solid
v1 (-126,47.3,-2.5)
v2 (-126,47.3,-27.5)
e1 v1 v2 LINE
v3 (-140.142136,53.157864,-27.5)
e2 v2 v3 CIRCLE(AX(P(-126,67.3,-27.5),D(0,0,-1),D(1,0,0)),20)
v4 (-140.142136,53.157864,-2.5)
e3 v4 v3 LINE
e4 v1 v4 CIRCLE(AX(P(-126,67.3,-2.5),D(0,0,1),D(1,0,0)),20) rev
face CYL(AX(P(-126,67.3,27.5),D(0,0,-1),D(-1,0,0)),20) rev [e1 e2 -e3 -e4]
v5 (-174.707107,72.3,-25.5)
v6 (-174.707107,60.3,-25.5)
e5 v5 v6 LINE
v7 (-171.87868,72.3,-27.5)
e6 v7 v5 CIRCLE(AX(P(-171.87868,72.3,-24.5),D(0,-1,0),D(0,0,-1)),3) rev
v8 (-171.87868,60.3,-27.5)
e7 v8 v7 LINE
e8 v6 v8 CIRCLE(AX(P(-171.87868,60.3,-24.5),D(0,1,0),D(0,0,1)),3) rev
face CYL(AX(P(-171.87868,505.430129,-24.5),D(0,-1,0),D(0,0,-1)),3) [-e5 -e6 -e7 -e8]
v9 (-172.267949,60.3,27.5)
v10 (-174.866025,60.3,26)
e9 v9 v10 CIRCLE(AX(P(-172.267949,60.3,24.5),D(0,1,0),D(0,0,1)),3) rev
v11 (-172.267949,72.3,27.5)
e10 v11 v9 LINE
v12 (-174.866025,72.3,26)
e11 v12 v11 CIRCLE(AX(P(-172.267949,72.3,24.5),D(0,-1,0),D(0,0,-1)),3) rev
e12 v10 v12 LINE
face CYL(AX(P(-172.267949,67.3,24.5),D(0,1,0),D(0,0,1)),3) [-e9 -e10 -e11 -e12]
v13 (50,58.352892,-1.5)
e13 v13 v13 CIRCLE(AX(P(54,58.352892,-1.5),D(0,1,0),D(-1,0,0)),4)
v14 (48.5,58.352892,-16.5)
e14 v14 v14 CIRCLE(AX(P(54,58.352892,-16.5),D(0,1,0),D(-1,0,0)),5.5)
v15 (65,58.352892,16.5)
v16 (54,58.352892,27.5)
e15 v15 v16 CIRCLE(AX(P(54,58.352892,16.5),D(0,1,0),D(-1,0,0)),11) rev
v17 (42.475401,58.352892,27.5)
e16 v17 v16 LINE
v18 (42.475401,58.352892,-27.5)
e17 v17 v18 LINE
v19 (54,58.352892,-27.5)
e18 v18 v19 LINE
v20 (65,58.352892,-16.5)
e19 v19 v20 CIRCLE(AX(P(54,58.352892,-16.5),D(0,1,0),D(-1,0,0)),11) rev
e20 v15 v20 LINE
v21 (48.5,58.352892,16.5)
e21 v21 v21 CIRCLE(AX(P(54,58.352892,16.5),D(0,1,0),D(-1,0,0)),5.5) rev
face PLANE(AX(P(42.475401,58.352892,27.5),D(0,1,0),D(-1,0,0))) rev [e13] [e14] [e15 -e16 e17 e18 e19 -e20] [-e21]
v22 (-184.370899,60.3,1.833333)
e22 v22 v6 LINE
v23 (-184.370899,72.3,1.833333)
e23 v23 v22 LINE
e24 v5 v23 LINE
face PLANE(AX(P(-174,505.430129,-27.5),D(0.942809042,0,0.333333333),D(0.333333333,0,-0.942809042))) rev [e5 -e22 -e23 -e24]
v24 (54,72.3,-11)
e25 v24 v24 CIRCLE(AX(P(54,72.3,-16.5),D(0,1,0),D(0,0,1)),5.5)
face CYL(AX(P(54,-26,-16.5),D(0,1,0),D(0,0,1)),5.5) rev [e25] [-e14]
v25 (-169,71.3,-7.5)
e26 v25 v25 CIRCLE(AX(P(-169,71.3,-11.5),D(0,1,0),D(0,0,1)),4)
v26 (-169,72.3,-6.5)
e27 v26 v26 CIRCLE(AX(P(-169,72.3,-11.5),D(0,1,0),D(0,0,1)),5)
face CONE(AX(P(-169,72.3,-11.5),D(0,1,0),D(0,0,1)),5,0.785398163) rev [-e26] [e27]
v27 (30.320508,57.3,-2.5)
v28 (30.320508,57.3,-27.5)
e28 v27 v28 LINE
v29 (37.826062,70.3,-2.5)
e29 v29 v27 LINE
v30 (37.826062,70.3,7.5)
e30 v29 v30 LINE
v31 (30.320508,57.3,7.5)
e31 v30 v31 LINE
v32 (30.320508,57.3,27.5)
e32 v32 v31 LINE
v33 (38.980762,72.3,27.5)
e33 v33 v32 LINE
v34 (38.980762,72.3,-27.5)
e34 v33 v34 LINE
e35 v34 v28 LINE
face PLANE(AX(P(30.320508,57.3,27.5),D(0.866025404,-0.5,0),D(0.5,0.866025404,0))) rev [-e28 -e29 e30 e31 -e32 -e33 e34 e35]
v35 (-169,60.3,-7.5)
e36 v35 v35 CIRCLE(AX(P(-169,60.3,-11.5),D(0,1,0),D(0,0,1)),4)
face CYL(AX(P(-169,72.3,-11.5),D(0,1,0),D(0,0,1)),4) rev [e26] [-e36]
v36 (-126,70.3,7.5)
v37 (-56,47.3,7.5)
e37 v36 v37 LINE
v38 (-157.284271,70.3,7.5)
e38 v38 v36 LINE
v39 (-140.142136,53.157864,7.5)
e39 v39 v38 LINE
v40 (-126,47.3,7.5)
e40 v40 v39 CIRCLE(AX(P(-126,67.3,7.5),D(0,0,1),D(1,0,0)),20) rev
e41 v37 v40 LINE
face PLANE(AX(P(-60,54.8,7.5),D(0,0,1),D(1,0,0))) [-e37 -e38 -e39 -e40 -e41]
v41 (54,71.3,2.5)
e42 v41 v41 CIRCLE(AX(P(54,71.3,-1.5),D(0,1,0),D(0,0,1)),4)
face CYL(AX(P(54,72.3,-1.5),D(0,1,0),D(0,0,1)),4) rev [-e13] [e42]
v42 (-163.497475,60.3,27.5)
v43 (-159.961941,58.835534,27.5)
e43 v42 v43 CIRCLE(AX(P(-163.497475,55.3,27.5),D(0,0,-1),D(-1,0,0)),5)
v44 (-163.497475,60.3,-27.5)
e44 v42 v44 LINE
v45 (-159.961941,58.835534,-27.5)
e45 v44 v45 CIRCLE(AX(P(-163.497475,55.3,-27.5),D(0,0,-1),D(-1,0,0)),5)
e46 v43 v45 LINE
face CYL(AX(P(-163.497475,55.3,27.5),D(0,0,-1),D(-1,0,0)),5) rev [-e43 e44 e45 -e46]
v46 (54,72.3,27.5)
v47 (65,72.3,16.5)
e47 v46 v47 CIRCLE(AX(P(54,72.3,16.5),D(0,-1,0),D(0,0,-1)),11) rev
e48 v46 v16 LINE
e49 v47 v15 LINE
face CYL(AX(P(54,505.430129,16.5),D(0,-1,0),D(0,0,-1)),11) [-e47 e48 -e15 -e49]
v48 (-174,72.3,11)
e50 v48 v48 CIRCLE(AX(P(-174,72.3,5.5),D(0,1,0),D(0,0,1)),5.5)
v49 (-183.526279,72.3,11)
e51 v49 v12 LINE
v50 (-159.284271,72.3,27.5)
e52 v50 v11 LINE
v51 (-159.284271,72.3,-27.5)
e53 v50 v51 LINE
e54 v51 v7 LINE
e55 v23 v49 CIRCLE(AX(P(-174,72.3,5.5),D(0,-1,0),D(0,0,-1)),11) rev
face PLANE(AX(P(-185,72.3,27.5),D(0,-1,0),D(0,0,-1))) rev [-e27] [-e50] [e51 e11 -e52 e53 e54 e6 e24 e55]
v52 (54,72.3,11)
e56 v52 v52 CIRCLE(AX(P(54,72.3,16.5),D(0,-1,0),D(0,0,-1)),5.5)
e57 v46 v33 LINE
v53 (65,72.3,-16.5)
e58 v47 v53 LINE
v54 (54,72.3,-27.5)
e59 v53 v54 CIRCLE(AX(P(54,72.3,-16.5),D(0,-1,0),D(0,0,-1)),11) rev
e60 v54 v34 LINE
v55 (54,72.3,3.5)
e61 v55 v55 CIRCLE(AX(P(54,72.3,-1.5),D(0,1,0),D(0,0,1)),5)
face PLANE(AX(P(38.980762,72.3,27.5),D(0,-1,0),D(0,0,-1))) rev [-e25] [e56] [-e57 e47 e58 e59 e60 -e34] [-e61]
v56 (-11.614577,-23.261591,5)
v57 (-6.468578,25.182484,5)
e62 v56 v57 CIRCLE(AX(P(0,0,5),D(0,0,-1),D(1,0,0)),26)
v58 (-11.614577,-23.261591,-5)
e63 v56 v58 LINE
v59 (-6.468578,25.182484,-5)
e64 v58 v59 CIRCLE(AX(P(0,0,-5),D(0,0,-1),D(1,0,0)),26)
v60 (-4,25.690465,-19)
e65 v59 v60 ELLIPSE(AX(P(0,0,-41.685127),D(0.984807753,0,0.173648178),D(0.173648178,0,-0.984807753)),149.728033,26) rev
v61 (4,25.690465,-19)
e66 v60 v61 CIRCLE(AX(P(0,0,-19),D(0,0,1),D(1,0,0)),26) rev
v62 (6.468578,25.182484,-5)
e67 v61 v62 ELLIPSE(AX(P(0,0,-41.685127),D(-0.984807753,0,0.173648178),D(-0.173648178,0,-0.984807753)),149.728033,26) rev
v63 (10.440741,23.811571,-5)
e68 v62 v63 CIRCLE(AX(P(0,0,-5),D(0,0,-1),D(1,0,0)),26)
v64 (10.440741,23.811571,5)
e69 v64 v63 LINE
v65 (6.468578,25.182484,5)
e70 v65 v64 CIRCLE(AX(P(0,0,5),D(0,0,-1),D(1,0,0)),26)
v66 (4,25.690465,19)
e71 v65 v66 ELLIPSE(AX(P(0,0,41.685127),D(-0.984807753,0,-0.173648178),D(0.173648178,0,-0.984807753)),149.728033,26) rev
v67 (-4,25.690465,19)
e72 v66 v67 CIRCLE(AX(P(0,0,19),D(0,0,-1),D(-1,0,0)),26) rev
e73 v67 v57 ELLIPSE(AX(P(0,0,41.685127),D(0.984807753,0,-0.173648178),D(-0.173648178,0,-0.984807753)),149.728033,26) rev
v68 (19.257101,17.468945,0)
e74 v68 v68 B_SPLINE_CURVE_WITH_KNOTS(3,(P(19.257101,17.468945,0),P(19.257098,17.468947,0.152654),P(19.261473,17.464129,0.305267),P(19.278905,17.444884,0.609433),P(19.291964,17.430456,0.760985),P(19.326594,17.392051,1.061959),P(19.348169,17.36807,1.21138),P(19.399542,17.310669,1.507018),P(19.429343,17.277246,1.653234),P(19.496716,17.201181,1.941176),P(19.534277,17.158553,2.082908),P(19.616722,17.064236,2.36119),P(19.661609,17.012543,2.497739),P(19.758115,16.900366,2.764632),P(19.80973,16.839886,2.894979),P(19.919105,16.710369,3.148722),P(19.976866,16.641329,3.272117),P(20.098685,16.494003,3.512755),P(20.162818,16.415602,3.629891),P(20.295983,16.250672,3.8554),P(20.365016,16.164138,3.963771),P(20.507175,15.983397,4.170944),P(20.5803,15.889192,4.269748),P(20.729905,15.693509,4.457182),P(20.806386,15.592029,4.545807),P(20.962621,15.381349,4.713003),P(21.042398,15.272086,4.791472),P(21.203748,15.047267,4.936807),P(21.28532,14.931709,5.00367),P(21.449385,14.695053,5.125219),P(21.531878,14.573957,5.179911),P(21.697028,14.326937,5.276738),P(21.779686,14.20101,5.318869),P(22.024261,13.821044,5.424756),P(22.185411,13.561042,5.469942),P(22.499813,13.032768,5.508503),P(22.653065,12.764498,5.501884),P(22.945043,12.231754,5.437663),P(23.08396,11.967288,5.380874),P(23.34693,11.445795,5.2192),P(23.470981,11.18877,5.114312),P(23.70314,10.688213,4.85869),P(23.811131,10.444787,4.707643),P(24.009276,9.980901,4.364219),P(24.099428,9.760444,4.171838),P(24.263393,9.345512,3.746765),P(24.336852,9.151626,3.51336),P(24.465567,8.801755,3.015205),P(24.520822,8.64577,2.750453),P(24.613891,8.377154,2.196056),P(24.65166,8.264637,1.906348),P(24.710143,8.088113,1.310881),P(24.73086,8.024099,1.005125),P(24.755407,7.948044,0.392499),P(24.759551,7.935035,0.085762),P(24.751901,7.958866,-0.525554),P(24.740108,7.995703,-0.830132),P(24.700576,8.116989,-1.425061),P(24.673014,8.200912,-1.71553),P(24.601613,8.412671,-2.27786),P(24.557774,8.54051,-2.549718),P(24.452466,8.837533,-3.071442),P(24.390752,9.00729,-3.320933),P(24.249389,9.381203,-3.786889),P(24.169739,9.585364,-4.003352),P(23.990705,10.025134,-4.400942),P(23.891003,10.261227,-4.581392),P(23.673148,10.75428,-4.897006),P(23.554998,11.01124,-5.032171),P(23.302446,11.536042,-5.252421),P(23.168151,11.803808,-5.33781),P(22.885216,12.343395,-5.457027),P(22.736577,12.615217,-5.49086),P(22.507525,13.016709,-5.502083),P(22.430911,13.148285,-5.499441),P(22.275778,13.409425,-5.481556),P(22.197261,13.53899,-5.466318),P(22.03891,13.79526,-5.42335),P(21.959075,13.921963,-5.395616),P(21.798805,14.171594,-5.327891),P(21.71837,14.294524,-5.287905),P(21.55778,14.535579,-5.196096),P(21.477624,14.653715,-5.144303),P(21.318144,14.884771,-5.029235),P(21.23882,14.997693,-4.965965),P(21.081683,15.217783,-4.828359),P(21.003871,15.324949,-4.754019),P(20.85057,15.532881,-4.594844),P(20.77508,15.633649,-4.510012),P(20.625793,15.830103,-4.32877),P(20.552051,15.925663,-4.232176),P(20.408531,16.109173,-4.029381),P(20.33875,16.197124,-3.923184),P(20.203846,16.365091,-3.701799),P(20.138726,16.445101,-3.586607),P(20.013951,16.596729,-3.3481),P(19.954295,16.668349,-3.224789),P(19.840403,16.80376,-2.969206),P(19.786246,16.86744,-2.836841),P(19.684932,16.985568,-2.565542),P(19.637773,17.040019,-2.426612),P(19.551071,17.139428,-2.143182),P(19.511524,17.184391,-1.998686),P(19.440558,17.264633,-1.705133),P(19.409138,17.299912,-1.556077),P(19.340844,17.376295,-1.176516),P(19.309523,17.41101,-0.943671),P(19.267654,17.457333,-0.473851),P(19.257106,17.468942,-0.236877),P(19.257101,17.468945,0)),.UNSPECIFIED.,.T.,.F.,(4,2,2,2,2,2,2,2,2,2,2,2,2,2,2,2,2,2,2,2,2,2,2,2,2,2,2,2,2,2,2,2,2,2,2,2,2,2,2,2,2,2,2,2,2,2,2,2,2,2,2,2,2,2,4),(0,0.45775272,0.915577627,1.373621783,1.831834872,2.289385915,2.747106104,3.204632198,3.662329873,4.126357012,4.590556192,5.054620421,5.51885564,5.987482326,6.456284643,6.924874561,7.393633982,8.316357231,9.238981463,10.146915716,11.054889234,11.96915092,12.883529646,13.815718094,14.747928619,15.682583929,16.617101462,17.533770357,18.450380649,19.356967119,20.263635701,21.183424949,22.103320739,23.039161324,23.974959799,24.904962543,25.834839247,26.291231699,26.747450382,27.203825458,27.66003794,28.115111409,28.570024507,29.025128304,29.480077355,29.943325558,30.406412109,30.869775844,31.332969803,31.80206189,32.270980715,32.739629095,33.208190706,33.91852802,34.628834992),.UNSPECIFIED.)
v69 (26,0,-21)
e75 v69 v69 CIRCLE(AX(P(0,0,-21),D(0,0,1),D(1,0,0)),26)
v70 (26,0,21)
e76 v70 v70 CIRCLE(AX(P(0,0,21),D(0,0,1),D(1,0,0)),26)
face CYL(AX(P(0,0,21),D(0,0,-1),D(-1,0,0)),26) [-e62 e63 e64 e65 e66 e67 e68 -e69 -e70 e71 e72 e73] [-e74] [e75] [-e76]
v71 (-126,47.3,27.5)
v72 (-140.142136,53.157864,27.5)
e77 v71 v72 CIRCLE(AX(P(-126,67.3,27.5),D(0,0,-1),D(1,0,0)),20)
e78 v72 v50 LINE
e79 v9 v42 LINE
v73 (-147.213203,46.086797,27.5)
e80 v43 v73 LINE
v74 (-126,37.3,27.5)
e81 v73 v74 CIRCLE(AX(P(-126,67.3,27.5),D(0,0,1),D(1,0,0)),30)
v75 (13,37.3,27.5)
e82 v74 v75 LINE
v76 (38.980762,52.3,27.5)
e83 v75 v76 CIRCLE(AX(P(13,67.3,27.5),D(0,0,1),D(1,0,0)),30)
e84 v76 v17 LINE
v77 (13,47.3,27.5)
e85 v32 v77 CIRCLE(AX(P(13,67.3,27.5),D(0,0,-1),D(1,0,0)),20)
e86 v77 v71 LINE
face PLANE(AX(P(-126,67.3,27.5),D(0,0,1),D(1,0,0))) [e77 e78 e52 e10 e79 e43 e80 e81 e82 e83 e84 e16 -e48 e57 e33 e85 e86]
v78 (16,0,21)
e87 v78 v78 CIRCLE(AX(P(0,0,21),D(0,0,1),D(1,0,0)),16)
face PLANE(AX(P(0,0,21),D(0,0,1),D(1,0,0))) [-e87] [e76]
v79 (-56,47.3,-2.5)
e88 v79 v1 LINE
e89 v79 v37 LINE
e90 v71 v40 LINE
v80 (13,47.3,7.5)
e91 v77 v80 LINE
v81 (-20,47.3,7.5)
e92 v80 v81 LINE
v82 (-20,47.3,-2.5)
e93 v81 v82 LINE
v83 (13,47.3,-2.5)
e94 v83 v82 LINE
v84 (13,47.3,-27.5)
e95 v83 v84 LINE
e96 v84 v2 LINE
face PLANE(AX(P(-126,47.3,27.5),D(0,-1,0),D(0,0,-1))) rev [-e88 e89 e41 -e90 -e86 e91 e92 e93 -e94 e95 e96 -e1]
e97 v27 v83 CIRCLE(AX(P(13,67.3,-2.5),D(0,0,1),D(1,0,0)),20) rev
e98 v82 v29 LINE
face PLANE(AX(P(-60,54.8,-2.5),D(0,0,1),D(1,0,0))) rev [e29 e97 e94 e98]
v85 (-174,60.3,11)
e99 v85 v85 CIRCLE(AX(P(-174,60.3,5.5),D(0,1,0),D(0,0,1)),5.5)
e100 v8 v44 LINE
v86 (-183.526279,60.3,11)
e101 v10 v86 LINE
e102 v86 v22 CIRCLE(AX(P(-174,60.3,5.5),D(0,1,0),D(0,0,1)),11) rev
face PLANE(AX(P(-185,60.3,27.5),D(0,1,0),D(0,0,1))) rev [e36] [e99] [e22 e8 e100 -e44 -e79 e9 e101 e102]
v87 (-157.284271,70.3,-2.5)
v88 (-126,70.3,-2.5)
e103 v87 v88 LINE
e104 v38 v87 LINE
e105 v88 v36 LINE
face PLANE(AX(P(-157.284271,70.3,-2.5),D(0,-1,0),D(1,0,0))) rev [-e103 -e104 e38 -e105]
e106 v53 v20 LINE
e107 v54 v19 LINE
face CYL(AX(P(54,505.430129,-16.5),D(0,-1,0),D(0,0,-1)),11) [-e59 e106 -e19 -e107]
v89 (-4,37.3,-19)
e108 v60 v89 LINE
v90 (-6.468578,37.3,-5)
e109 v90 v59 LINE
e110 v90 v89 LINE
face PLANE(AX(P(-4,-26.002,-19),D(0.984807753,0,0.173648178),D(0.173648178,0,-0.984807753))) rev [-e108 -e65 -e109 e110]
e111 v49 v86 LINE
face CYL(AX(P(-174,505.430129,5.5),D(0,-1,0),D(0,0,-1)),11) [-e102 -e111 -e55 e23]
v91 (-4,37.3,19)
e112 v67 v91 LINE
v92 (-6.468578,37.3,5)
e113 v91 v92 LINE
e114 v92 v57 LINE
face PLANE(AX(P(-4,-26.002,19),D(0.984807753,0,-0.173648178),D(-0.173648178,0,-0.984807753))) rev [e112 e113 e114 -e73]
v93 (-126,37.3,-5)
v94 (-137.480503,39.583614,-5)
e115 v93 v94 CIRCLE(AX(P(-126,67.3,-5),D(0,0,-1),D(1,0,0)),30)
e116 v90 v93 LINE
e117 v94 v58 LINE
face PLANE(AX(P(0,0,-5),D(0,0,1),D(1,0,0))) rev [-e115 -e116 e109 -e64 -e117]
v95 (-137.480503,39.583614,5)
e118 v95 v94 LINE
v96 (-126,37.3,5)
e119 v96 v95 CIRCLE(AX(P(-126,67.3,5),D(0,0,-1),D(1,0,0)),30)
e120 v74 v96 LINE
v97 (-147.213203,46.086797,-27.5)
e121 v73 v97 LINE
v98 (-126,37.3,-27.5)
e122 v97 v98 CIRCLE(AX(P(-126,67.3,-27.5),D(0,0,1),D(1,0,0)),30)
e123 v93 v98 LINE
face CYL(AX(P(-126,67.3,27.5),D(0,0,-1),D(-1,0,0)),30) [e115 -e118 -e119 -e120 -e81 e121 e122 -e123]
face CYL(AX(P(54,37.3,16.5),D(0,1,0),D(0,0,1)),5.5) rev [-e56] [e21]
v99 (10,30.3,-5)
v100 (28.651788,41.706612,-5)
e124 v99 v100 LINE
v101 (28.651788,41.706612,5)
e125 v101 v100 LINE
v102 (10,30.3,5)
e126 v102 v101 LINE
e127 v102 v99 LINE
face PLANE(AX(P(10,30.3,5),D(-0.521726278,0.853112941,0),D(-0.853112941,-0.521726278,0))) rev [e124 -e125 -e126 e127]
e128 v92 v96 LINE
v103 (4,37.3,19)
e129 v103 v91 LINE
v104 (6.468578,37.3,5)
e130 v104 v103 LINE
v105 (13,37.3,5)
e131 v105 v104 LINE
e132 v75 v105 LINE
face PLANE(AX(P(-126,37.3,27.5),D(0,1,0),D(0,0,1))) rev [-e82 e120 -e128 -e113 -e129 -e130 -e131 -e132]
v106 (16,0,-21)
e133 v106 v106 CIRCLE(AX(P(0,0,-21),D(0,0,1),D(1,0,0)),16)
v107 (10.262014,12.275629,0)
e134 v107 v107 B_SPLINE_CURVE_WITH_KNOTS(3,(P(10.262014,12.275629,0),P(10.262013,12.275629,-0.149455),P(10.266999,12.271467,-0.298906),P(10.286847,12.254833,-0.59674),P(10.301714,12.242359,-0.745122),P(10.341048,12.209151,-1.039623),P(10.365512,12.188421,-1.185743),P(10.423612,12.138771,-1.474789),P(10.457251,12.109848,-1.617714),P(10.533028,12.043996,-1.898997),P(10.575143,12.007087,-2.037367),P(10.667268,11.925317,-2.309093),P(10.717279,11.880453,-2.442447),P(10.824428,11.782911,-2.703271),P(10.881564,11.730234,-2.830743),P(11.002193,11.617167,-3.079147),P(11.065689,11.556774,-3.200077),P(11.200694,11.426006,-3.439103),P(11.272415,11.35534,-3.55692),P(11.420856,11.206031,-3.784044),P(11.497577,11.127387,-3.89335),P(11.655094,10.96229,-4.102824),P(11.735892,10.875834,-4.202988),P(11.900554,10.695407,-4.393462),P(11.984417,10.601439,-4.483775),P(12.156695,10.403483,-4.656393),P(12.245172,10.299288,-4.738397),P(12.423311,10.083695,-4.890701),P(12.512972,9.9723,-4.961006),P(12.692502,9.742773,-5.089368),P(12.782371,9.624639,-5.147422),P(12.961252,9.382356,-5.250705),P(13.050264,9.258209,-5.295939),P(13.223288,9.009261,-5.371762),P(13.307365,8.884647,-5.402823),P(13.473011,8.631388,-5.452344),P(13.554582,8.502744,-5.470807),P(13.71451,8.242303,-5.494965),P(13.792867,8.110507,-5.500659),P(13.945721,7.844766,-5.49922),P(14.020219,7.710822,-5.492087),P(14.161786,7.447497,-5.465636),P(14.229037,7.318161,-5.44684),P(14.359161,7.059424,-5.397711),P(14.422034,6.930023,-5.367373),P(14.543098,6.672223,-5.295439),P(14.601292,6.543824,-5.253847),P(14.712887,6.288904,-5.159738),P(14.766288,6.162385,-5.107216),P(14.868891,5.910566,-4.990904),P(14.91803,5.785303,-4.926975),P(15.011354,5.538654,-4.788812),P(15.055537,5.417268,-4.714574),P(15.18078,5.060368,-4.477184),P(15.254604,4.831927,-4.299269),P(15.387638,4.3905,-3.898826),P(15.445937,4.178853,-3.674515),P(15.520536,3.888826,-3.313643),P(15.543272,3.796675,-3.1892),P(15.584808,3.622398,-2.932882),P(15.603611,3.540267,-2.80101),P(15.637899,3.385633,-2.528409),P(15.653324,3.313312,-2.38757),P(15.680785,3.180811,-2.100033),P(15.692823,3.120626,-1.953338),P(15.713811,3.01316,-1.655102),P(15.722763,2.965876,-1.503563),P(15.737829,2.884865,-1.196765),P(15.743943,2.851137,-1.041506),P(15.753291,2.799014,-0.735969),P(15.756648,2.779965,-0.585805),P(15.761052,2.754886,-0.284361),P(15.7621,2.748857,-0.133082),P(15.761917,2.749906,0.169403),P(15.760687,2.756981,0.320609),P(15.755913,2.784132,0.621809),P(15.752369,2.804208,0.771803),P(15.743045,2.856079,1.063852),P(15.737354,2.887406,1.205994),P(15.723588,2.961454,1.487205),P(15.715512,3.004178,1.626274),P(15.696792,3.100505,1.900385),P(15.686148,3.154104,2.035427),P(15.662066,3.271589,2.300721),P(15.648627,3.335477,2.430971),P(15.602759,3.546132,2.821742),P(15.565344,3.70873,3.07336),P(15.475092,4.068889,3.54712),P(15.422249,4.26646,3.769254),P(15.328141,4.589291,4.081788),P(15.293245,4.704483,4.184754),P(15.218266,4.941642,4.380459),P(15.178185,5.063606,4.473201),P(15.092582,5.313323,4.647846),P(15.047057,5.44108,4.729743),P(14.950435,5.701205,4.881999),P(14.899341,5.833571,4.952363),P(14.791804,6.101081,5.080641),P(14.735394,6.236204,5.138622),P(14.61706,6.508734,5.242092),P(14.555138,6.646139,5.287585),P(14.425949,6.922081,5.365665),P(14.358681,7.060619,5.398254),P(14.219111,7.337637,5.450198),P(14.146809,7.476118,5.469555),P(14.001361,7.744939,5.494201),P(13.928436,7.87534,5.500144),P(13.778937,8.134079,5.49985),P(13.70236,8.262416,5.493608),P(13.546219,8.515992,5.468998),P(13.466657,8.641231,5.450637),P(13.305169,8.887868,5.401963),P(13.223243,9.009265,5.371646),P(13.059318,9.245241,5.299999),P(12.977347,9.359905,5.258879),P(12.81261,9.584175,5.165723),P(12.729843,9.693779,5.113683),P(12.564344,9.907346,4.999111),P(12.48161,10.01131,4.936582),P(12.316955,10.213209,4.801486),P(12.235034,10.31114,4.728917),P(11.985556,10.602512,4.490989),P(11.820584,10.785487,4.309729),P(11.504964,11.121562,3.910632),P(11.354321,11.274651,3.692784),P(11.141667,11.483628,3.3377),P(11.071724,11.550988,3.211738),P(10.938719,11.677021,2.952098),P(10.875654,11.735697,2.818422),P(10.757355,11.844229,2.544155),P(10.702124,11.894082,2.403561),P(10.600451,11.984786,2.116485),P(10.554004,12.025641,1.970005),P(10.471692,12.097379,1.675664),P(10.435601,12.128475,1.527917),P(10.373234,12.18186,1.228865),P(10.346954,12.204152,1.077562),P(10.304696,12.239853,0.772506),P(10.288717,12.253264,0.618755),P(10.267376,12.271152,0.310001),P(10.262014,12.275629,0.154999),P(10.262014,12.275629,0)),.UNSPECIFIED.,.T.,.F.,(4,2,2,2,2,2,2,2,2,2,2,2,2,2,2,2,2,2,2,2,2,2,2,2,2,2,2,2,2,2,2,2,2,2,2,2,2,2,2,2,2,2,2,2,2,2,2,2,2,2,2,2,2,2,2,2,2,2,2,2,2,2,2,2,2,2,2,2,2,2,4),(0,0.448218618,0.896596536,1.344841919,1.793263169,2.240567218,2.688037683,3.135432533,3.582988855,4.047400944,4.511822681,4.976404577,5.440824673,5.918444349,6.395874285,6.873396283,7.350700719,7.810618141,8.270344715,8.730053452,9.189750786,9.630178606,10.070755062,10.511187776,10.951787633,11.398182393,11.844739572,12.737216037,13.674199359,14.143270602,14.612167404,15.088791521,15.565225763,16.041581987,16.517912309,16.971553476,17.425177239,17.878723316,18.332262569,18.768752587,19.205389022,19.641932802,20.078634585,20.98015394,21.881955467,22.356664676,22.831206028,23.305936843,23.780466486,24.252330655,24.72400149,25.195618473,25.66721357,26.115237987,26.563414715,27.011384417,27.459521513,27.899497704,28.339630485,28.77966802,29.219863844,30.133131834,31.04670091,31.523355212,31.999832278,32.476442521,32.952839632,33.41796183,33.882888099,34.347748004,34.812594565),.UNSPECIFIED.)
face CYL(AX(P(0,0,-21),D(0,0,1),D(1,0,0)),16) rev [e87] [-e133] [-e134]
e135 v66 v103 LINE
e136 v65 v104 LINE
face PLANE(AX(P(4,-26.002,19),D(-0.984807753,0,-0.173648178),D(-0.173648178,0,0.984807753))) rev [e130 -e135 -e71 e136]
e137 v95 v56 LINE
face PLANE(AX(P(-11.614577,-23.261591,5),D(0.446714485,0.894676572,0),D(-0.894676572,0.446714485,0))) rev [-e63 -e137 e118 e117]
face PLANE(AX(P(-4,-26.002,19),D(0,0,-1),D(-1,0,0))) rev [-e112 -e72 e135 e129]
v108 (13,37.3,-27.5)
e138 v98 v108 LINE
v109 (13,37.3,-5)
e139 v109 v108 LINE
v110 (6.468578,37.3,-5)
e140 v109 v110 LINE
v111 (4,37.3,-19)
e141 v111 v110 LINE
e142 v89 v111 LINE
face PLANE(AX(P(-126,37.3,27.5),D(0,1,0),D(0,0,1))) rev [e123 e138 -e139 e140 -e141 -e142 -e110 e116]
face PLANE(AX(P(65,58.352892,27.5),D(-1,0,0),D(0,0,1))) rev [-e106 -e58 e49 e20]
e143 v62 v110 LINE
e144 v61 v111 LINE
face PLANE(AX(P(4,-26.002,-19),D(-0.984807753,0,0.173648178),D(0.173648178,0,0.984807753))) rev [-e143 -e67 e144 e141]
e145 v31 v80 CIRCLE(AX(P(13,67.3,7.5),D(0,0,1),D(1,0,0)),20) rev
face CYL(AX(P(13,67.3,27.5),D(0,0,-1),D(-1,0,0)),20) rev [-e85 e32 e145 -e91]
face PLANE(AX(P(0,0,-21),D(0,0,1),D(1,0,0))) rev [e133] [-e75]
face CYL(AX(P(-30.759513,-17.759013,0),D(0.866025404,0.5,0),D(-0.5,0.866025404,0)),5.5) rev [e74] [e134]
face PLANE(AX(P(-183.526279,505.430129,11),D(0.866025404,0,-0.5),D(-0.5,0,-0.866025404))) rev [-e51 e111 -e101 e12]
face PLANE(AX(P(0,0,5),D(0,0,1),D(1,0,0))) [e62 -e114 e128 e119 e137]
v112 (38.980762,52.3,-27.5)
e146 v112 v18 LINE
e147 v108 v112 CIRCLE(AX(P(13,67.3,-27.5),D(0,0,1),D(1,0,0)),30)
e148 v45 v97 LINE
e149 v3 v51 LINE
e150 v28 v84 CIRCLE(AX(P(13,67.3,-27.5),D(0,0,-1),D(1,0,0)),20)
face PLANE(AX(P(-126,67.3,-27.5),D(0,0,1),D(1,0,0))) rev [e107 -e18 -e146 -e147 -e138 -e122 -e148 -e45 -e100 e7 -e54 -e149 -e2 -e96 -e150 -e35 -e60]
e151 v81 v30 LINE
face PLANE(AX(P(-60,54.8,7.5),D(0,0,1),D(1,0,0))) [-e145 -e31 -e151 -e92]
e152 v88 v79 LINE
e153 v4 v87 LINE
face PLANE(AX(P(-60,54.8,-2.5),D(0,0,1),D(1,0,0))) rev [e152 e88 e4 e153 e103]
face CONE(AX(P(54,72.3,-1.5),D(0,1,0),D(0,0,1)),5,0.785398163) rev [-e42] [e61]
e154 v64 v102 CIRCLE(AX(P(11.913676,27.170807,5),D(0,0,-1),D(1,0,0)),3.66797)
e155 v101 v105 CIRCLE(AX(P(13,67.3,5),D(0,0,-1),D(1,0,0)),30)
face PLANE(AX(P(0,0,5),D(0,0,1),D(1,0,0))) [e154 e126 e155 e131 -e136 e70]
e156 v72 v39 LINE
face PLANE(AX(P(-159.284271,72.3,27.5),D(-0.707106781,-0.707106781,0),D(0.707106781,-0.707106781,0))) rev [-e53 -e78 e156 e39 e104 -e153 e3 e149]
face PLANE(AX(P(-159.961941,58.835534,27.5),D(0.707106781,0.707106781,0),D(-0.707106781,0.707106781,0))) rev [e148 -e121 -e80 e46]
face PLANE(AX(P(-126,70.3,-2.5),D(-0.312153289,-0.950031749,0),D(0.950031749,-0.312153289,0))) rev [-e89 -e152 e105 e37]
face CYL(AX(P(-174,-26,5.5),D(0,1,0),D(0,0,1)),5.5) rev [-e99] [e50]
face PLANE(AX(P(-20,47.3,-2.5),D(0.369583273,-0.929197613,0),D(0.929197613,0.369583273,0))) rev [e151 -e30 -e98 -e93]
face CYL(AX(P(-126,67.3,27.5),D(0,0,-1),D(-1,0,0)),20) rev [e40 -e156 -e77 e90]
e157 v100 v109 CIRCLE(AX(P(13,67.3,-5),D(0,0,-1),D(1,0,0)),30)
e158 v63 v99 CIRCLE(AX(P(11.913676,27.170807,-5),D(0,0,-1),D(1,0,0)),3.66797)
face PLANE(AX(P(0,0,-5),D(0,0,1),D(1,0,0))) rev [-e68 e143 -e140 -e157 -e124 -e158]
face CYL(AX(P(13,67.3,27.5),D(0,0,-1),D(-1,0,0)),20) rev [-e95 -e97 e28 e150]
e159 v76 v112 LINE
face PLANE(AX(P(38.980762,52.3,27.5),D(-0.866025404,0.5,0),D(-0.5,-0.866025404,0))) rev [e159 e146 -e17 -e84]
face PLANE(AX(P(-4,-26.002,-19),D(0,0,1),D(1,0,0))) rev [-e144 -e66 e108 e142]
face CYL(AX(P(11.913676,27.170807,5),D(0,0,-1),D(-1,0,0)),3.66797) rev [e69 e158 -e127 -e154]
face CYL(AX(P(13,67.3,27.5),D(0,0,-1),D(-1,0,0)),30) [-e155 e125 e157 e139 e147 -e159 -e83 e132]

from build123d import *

# Parameters (mm, degrees)
SKETCH_1_R               = 26
EXTRUDE_1_DEPTH          = 21
SKETCH_2_R               = 16
CUT_EXTRUDE_1_DEPTH      = 56.821142948
CUT_EXTRUDE_2_REACH      = 67.695
CUT_EXTRUDE_2_END_RADIUS = 16
SKETCH_3_R               = 5.5
EXTRUDE_2_DEPTH          = 27.5
CUT_EXTRUDE_4_DEPTH      = 212.291599501
CUT_EXTRUDE_4_DEPTH_BACK = 212.291599501
CUT_EXTRUDE_START        = -13.947107552
CUT_EXTRUDE_6_DEPTH      = 13.947107552
SKETCH_7_R               = 5.5
CUT_EXTRUDE_7_DEPTH      = 212.291599501
SKETCH_8_R               = 5.5
CUT_EXTRUDE_8_DEPTH      = 212.291599501
RIB_1_DEPTH              = 10
FILLET_1_R               = 3
RIB_8_REACH              = 202.879
SKETCH_16_WALL_W         = 465.989842276
SKETCH_16_WALL_H         = 10
EXTRUDE_3_DEPTH          = 5
EXTRUDE_4_REACH          = 199.454
EXTRUDE_4_END_RADIUS     = 26


# Read off the part's stored shape, not the designer's step: 切除-拉伸6, 筋1
with BuildPart() as part:
    # 草图1 → 凸台-拉伸1 (new, symmetric)
    with BuildSketch(Plane.XY):
        with Locations(Location((0, 0, 0), (0, 0, 180))):
            Circle(SKETCH_1_R)
    extrude(amount=EXTRUDE_1_DEPTH, both=True)

    # 草图2 → 切除-拉伸1 (cut, through all)
    with BuildSketch(Plane.XY.offset(21)):
        Circle(SKETCH_2_R)
    extrude(amount=-CUT_EXTRUDE_1_DEPTH, mode=Mode.SUBTRACT)

    # 切除-拉伸2: up to this cylinder (the profile starts outside it)
    cut_extrude_2_end = Plane(origin=(0, 0, 0), z_dir=(0, 0, 1)) * Cylinder(CUT_EXTRUDE_2_END_RADIUS, 168.39, mode=Mode.PRIVATE)
    # 草图3 → 切除-拉伸2 (cut, up to the surface)
    with BuildSketch(Plane(origin=(22.516660498, 13, 0), x_dir=(0, 0, -1), z_dir=(0.8660254037844398, 0.499999999999998, 0)), mode=Mode.PRIVATE) as cut_extrude_2_sk1:
        with Locations(Location((0, 0, 0), (0, 0, 90))):
            Circle(SKETCH_3_R)
    cut_extrude_2_tool1 = extrude(cut_extrude_2_sk1.sketch, amount=-CUT_EXTRUDE_2_REACH, mode=Mode.PRIVATE) - cut_extrude_2_end
    add(cut_extrude_2_tool1.solids().sort_by_distance((22.51666, 13, 0))[0], mode=Mode.SUBTRACT)



with BuildPart() as body_2:
    # 草图4 → 凸台-拉伸2 (new, symmetric)
    with BuildSketch(Plane.XY):
        with BuildLine():
            Line((-185, 60.3), (-163.497474683, 60.3))
            ThreePointArc((-163.497474683, 60.3), (-161.584057521, 59.919397663), (-159.961940777, 58.835533906))
            Line((-159.961940777, 58.835533906), (-147.213203436, 46.086796564))
            ThreePointArc((-147.213203436, 46.086796564), (-137.480502971, 39.583614025), (-126, 37.3))
            Line((-126, 37.3), (13, 37.3))
            ThreePointArc((13, 37.3), (28, 41.319237886), (38.980762114, 52.3))
            Line((38.980762114, 52.3), (42.475401198, 58.352892448))
            Line((42.475401198, 58.352892448), (65, 58.352892448))
            Line((65, 58.352892448), (65, 72.3))
            Line((65, 72.3), (38.980762114, 72.3))
            Line((38.980762114, 72.3), (30.320508076, 57.3))
            ThreePointArc((30.320508076, 57.3), (23, 49.979491924), (13, 47.3))
            Line((13, 47.3), (-126, 47.3))
            ThreePointArc((-126, 47.3), (-133.653668647, 48.82240935), (-140.142135624, 53.157864376))
            Line((-140.142135624, 53.157864376), (-159.284271247, 72.3))
            Line((-159.284271247, 72.3), (-185, 72.3))
            Line((-185, 72.3), (-185, 60.3))
        make_face()
    extrude(amount=EXTRUDE_2_DEPTH, both=True)

    # 草图5 → 切除-拉伸4 (cut, two sides: drawn at the far end of the back side and taken through both)
    with BuildSketch(Plane(origin=(0, 72.3, 0), x_dir=(1, 0, 0), z_dir=(0, 1, 0)).offset(-CUT_EXTRUDE_4_DEPTH_BACK)):
        with BuildLine():
            Line((-7.168790364, 499.369918589), (-174, 27.5))
            Line((-174, 27.5), (-184.370899457, -1.833333333))
            ThreePointArc((-184.370899457, -1.833333333), (-184.953601074, -6.509268805), (-183.526279442, -11))
            Line((-183.526279442, -11), (-174, -27.5))
            Line((-174, -27.5), (76.246814454, -460.940197067))
            Line((76.246814454, -460.940197067), (-920.985347946, -547.562968831))
            Line((-920.985347946, -547.562968831), (-1004.400952764, 412.747146826))
            Line((-1004.400952764, 412.747146826), (-7.168790364, 499.369918589))
        make_face()
    extrude(amount=CUT_EXTRUDE_4_DEPTH + CUT_EXTRUDE_4_DEPTH_BACK, mode=Mode.SUBTRACT)

    # 切除-拉伸6 outline → 切除-拉伸6 (cut)
    with BuildSketch(Plane(origin=(0, 72.3, 0), x_dir=(1, 0, 0), z_dir=(0, 1, 0)).offset(CUT_EXTRUDE_START)):
        with BuildLine():
            Line((65, -27.5), (65, -16.5))
            ThreePointArc((65, -16.5), (61.778174593, -24.278174593), (54, -27.5))
            Line((54, -27.5), (65, -27.5))
        make_face()
        with BuildLine():
            ThreePointArc((54, 27.5), (61.778174593, 24.278174593), (65, 16.5))
            Line((65, 16.5), (65, 27.5))
            Line((65, 27.5), (54, 27.5))
        make_face()
    extrude(amount=CUT_EXTRUDE_6_DEPTH, mode=Mode.SUBTRACT)

    # 草图7 → 切除-拉伸7 (cut, through all)
    with BuildSketch(Plane(origin=(0, 72.3, 0), x_dir=(1, 0, 0), z_dir=(0, 1, 0))):
        with Locations(Location((54, 16.5, 0), (0, 0, 270))):
            Circle(SKETCH_7_R)
    cut_extrude_7 = extrude(amount=-CUT_EXTRUDE_7_DEPTH, mode=Mode.SUBTRACT)

    # 镜向1: 切除-拉伸7 across plane
    add(cut_extrude_7.mirror(Plane.XY), mode=Mode.SUBTRACT)

    # 草图8 → 切除-拉伸8 (cut, through all)
    with BuildSketch(Plane(origin=(0, 72.3, 0), x_dir=(1, 0, 0), z_dir=(0, 1, 0))):
        with Locations(Location((-174, -5.5, 0), (0, 0, 270))):
            Circle(SKETCH_8_R)
    extrude(amount=-CUT_EXTRUDE_8_DEPTH, mode=Mode.SUBTRACT)

    # 草图10 → Ø8.0mm 暗销孔1 (revolve, cut)
    with BuildSketch(Plane(origin=(54, 72.3, -1.5), x_dir=(0, 0, 1), z_dir=(1, 0, 0))):
        Polygon((0, 0), (0, 13.948107552), (4, 13.948107552), (4, 1), (5, 0), align=None)
    revolve(axis=Axis((54, 78.65, -1.5), (0, -1, 0)), mode=Mode.SUBTRACT)

    # 草图12 → Ø8.0mm 暗销孔2 (revolve, cut)
    with BuildSketch(Plane(origin=(-169, 72.3, -11.5), x_dir=(0, 0, 1), z_dir=(1, 0, 0))):
        Polygon((0, 0), (0, 12.001), (4, 12.001), (4, 1), (5, 0), align=None)
    revolve(axis=Axis((-169, 78.65, -11.5), (0, -1, 0)), mode=Mode.SUBTRACT)

    # 筋1 outline → 筋1 (add)
    with BuildSketch(Plane.XY.offset(-2.5)):
        with BuildLine():
            Line((-56, 47.3), (-126, 70.3))
            Line((-126, 70.3), (-157.284271247, 70.3))
            Line((-157.284271247, 70.3), (-140.142135624, 53.157864376))
            ThreePointArc((-140.142135624, 53.157864376), (-133.653668647, 48.82240935), (-126, 47.3))
            Line((-126, 47.3), (-56, 47.3))
        make_face()
    extrude(amount=RIB_1_DEPTH)

    # 圆角1
    fillet_1_edges = [body_2.edges().sort_by_distance(p)[0] for p in [
        (-174, 66.3, -27.5),
        (-174, 66.3, 27.5),
    ]]
    fillet(fillet_1_edges, radius=FILLET_1_R)

    # 草图16 wall → 筋8 (add, up to next)
    with BuildSketch(Plane(origin=(8.913030787, 58.8, -2.5), x_dir=(0.929197613161, 0.369583273019, 0), z_dir=(-0.369583273019, 0.929197613161, 0)), mode=Mode.PRIVATE) as rib_8_sk1:
        with Locations((0, -5)):
            Rectangle(SKETCH_16_WALL_W, SKETCH_16_WALL_H)
    rib_8_tool1 = extrude(rib_8_sk1.sketch, amount=-RIB_8_REACH, mode=Mode.PRIVATE) - body_2.part
    add(rib_8_tool1.solids().sort_by_distance((8.913030787, 58.8, -2.5))[0])


with BuildPart() as part_1:
    add(part.part)

    add(body_2.part)  # 凸台-拉伸3 merges body 2
    # 草图17 → 凸台-拉伸3 (add, symmetric)
    with BuildSketch(Plane.XY):
        with BuildLine():
            Line((-11.614576615, -23.261590875), (-137.480502971, 39.583614025))
            ThreePointArc((-137.480502971, 39.583614025), (-131.85270966, 37.876441588), (-126, 37.3))
            Line((-126, 37.3), (13, 37.3))
            ThreePointArc((13, 37.3), (21.130139995, 38.422658993), (28.651788339, 41.706611756))
            Line((28.651788339, 41.706611756), (10, 30.3))
            ThreePointArc((10, 30.3), (8.254139309, 26.922225109), (10.440740808, 23.811571375))
            ThreePointArc((10.440740808, 23.811571375), (-23.543897802, 11.031086814), (-11.614576615, -23.261590875))
        make_face()
    extrude(amount=EXTRUDE_3_DEPTH, both=True)

    # 凸台-拉伸4: up to this cylinder (the profile starts outside it)
    extrude_4_end = Plane(origin=(0, 0, 0), z_dir=(0, 0, -1)) * Cylinder(EXTRUDE_4_END_RADIUS, 451.908, mode=Mode.PRIVATE)
    # 草图19 → 凸台-拉伸4 (add, up to the surface)
    with BuildSketch(Plane.XZ.offset(-37.3), mode=Mode.PRIVATE) as extrude_4_sk1:
        Polygon((-4, -19), (4, -19), (7.350212633, 0), (4, 19), (-4, 19), (-7.350212633, 0), align=None)
    extrude_4_tool1 = extrude(extrude_4_sk1.sketch, amount=EXTRUDE_4_REACH, mode=Mode.PRIVATE) - extrude_4_end
    add(extrude_4_tool1.solids().sort_by_distance((0, 37.3, 0))[0])


solid = part_1.part
